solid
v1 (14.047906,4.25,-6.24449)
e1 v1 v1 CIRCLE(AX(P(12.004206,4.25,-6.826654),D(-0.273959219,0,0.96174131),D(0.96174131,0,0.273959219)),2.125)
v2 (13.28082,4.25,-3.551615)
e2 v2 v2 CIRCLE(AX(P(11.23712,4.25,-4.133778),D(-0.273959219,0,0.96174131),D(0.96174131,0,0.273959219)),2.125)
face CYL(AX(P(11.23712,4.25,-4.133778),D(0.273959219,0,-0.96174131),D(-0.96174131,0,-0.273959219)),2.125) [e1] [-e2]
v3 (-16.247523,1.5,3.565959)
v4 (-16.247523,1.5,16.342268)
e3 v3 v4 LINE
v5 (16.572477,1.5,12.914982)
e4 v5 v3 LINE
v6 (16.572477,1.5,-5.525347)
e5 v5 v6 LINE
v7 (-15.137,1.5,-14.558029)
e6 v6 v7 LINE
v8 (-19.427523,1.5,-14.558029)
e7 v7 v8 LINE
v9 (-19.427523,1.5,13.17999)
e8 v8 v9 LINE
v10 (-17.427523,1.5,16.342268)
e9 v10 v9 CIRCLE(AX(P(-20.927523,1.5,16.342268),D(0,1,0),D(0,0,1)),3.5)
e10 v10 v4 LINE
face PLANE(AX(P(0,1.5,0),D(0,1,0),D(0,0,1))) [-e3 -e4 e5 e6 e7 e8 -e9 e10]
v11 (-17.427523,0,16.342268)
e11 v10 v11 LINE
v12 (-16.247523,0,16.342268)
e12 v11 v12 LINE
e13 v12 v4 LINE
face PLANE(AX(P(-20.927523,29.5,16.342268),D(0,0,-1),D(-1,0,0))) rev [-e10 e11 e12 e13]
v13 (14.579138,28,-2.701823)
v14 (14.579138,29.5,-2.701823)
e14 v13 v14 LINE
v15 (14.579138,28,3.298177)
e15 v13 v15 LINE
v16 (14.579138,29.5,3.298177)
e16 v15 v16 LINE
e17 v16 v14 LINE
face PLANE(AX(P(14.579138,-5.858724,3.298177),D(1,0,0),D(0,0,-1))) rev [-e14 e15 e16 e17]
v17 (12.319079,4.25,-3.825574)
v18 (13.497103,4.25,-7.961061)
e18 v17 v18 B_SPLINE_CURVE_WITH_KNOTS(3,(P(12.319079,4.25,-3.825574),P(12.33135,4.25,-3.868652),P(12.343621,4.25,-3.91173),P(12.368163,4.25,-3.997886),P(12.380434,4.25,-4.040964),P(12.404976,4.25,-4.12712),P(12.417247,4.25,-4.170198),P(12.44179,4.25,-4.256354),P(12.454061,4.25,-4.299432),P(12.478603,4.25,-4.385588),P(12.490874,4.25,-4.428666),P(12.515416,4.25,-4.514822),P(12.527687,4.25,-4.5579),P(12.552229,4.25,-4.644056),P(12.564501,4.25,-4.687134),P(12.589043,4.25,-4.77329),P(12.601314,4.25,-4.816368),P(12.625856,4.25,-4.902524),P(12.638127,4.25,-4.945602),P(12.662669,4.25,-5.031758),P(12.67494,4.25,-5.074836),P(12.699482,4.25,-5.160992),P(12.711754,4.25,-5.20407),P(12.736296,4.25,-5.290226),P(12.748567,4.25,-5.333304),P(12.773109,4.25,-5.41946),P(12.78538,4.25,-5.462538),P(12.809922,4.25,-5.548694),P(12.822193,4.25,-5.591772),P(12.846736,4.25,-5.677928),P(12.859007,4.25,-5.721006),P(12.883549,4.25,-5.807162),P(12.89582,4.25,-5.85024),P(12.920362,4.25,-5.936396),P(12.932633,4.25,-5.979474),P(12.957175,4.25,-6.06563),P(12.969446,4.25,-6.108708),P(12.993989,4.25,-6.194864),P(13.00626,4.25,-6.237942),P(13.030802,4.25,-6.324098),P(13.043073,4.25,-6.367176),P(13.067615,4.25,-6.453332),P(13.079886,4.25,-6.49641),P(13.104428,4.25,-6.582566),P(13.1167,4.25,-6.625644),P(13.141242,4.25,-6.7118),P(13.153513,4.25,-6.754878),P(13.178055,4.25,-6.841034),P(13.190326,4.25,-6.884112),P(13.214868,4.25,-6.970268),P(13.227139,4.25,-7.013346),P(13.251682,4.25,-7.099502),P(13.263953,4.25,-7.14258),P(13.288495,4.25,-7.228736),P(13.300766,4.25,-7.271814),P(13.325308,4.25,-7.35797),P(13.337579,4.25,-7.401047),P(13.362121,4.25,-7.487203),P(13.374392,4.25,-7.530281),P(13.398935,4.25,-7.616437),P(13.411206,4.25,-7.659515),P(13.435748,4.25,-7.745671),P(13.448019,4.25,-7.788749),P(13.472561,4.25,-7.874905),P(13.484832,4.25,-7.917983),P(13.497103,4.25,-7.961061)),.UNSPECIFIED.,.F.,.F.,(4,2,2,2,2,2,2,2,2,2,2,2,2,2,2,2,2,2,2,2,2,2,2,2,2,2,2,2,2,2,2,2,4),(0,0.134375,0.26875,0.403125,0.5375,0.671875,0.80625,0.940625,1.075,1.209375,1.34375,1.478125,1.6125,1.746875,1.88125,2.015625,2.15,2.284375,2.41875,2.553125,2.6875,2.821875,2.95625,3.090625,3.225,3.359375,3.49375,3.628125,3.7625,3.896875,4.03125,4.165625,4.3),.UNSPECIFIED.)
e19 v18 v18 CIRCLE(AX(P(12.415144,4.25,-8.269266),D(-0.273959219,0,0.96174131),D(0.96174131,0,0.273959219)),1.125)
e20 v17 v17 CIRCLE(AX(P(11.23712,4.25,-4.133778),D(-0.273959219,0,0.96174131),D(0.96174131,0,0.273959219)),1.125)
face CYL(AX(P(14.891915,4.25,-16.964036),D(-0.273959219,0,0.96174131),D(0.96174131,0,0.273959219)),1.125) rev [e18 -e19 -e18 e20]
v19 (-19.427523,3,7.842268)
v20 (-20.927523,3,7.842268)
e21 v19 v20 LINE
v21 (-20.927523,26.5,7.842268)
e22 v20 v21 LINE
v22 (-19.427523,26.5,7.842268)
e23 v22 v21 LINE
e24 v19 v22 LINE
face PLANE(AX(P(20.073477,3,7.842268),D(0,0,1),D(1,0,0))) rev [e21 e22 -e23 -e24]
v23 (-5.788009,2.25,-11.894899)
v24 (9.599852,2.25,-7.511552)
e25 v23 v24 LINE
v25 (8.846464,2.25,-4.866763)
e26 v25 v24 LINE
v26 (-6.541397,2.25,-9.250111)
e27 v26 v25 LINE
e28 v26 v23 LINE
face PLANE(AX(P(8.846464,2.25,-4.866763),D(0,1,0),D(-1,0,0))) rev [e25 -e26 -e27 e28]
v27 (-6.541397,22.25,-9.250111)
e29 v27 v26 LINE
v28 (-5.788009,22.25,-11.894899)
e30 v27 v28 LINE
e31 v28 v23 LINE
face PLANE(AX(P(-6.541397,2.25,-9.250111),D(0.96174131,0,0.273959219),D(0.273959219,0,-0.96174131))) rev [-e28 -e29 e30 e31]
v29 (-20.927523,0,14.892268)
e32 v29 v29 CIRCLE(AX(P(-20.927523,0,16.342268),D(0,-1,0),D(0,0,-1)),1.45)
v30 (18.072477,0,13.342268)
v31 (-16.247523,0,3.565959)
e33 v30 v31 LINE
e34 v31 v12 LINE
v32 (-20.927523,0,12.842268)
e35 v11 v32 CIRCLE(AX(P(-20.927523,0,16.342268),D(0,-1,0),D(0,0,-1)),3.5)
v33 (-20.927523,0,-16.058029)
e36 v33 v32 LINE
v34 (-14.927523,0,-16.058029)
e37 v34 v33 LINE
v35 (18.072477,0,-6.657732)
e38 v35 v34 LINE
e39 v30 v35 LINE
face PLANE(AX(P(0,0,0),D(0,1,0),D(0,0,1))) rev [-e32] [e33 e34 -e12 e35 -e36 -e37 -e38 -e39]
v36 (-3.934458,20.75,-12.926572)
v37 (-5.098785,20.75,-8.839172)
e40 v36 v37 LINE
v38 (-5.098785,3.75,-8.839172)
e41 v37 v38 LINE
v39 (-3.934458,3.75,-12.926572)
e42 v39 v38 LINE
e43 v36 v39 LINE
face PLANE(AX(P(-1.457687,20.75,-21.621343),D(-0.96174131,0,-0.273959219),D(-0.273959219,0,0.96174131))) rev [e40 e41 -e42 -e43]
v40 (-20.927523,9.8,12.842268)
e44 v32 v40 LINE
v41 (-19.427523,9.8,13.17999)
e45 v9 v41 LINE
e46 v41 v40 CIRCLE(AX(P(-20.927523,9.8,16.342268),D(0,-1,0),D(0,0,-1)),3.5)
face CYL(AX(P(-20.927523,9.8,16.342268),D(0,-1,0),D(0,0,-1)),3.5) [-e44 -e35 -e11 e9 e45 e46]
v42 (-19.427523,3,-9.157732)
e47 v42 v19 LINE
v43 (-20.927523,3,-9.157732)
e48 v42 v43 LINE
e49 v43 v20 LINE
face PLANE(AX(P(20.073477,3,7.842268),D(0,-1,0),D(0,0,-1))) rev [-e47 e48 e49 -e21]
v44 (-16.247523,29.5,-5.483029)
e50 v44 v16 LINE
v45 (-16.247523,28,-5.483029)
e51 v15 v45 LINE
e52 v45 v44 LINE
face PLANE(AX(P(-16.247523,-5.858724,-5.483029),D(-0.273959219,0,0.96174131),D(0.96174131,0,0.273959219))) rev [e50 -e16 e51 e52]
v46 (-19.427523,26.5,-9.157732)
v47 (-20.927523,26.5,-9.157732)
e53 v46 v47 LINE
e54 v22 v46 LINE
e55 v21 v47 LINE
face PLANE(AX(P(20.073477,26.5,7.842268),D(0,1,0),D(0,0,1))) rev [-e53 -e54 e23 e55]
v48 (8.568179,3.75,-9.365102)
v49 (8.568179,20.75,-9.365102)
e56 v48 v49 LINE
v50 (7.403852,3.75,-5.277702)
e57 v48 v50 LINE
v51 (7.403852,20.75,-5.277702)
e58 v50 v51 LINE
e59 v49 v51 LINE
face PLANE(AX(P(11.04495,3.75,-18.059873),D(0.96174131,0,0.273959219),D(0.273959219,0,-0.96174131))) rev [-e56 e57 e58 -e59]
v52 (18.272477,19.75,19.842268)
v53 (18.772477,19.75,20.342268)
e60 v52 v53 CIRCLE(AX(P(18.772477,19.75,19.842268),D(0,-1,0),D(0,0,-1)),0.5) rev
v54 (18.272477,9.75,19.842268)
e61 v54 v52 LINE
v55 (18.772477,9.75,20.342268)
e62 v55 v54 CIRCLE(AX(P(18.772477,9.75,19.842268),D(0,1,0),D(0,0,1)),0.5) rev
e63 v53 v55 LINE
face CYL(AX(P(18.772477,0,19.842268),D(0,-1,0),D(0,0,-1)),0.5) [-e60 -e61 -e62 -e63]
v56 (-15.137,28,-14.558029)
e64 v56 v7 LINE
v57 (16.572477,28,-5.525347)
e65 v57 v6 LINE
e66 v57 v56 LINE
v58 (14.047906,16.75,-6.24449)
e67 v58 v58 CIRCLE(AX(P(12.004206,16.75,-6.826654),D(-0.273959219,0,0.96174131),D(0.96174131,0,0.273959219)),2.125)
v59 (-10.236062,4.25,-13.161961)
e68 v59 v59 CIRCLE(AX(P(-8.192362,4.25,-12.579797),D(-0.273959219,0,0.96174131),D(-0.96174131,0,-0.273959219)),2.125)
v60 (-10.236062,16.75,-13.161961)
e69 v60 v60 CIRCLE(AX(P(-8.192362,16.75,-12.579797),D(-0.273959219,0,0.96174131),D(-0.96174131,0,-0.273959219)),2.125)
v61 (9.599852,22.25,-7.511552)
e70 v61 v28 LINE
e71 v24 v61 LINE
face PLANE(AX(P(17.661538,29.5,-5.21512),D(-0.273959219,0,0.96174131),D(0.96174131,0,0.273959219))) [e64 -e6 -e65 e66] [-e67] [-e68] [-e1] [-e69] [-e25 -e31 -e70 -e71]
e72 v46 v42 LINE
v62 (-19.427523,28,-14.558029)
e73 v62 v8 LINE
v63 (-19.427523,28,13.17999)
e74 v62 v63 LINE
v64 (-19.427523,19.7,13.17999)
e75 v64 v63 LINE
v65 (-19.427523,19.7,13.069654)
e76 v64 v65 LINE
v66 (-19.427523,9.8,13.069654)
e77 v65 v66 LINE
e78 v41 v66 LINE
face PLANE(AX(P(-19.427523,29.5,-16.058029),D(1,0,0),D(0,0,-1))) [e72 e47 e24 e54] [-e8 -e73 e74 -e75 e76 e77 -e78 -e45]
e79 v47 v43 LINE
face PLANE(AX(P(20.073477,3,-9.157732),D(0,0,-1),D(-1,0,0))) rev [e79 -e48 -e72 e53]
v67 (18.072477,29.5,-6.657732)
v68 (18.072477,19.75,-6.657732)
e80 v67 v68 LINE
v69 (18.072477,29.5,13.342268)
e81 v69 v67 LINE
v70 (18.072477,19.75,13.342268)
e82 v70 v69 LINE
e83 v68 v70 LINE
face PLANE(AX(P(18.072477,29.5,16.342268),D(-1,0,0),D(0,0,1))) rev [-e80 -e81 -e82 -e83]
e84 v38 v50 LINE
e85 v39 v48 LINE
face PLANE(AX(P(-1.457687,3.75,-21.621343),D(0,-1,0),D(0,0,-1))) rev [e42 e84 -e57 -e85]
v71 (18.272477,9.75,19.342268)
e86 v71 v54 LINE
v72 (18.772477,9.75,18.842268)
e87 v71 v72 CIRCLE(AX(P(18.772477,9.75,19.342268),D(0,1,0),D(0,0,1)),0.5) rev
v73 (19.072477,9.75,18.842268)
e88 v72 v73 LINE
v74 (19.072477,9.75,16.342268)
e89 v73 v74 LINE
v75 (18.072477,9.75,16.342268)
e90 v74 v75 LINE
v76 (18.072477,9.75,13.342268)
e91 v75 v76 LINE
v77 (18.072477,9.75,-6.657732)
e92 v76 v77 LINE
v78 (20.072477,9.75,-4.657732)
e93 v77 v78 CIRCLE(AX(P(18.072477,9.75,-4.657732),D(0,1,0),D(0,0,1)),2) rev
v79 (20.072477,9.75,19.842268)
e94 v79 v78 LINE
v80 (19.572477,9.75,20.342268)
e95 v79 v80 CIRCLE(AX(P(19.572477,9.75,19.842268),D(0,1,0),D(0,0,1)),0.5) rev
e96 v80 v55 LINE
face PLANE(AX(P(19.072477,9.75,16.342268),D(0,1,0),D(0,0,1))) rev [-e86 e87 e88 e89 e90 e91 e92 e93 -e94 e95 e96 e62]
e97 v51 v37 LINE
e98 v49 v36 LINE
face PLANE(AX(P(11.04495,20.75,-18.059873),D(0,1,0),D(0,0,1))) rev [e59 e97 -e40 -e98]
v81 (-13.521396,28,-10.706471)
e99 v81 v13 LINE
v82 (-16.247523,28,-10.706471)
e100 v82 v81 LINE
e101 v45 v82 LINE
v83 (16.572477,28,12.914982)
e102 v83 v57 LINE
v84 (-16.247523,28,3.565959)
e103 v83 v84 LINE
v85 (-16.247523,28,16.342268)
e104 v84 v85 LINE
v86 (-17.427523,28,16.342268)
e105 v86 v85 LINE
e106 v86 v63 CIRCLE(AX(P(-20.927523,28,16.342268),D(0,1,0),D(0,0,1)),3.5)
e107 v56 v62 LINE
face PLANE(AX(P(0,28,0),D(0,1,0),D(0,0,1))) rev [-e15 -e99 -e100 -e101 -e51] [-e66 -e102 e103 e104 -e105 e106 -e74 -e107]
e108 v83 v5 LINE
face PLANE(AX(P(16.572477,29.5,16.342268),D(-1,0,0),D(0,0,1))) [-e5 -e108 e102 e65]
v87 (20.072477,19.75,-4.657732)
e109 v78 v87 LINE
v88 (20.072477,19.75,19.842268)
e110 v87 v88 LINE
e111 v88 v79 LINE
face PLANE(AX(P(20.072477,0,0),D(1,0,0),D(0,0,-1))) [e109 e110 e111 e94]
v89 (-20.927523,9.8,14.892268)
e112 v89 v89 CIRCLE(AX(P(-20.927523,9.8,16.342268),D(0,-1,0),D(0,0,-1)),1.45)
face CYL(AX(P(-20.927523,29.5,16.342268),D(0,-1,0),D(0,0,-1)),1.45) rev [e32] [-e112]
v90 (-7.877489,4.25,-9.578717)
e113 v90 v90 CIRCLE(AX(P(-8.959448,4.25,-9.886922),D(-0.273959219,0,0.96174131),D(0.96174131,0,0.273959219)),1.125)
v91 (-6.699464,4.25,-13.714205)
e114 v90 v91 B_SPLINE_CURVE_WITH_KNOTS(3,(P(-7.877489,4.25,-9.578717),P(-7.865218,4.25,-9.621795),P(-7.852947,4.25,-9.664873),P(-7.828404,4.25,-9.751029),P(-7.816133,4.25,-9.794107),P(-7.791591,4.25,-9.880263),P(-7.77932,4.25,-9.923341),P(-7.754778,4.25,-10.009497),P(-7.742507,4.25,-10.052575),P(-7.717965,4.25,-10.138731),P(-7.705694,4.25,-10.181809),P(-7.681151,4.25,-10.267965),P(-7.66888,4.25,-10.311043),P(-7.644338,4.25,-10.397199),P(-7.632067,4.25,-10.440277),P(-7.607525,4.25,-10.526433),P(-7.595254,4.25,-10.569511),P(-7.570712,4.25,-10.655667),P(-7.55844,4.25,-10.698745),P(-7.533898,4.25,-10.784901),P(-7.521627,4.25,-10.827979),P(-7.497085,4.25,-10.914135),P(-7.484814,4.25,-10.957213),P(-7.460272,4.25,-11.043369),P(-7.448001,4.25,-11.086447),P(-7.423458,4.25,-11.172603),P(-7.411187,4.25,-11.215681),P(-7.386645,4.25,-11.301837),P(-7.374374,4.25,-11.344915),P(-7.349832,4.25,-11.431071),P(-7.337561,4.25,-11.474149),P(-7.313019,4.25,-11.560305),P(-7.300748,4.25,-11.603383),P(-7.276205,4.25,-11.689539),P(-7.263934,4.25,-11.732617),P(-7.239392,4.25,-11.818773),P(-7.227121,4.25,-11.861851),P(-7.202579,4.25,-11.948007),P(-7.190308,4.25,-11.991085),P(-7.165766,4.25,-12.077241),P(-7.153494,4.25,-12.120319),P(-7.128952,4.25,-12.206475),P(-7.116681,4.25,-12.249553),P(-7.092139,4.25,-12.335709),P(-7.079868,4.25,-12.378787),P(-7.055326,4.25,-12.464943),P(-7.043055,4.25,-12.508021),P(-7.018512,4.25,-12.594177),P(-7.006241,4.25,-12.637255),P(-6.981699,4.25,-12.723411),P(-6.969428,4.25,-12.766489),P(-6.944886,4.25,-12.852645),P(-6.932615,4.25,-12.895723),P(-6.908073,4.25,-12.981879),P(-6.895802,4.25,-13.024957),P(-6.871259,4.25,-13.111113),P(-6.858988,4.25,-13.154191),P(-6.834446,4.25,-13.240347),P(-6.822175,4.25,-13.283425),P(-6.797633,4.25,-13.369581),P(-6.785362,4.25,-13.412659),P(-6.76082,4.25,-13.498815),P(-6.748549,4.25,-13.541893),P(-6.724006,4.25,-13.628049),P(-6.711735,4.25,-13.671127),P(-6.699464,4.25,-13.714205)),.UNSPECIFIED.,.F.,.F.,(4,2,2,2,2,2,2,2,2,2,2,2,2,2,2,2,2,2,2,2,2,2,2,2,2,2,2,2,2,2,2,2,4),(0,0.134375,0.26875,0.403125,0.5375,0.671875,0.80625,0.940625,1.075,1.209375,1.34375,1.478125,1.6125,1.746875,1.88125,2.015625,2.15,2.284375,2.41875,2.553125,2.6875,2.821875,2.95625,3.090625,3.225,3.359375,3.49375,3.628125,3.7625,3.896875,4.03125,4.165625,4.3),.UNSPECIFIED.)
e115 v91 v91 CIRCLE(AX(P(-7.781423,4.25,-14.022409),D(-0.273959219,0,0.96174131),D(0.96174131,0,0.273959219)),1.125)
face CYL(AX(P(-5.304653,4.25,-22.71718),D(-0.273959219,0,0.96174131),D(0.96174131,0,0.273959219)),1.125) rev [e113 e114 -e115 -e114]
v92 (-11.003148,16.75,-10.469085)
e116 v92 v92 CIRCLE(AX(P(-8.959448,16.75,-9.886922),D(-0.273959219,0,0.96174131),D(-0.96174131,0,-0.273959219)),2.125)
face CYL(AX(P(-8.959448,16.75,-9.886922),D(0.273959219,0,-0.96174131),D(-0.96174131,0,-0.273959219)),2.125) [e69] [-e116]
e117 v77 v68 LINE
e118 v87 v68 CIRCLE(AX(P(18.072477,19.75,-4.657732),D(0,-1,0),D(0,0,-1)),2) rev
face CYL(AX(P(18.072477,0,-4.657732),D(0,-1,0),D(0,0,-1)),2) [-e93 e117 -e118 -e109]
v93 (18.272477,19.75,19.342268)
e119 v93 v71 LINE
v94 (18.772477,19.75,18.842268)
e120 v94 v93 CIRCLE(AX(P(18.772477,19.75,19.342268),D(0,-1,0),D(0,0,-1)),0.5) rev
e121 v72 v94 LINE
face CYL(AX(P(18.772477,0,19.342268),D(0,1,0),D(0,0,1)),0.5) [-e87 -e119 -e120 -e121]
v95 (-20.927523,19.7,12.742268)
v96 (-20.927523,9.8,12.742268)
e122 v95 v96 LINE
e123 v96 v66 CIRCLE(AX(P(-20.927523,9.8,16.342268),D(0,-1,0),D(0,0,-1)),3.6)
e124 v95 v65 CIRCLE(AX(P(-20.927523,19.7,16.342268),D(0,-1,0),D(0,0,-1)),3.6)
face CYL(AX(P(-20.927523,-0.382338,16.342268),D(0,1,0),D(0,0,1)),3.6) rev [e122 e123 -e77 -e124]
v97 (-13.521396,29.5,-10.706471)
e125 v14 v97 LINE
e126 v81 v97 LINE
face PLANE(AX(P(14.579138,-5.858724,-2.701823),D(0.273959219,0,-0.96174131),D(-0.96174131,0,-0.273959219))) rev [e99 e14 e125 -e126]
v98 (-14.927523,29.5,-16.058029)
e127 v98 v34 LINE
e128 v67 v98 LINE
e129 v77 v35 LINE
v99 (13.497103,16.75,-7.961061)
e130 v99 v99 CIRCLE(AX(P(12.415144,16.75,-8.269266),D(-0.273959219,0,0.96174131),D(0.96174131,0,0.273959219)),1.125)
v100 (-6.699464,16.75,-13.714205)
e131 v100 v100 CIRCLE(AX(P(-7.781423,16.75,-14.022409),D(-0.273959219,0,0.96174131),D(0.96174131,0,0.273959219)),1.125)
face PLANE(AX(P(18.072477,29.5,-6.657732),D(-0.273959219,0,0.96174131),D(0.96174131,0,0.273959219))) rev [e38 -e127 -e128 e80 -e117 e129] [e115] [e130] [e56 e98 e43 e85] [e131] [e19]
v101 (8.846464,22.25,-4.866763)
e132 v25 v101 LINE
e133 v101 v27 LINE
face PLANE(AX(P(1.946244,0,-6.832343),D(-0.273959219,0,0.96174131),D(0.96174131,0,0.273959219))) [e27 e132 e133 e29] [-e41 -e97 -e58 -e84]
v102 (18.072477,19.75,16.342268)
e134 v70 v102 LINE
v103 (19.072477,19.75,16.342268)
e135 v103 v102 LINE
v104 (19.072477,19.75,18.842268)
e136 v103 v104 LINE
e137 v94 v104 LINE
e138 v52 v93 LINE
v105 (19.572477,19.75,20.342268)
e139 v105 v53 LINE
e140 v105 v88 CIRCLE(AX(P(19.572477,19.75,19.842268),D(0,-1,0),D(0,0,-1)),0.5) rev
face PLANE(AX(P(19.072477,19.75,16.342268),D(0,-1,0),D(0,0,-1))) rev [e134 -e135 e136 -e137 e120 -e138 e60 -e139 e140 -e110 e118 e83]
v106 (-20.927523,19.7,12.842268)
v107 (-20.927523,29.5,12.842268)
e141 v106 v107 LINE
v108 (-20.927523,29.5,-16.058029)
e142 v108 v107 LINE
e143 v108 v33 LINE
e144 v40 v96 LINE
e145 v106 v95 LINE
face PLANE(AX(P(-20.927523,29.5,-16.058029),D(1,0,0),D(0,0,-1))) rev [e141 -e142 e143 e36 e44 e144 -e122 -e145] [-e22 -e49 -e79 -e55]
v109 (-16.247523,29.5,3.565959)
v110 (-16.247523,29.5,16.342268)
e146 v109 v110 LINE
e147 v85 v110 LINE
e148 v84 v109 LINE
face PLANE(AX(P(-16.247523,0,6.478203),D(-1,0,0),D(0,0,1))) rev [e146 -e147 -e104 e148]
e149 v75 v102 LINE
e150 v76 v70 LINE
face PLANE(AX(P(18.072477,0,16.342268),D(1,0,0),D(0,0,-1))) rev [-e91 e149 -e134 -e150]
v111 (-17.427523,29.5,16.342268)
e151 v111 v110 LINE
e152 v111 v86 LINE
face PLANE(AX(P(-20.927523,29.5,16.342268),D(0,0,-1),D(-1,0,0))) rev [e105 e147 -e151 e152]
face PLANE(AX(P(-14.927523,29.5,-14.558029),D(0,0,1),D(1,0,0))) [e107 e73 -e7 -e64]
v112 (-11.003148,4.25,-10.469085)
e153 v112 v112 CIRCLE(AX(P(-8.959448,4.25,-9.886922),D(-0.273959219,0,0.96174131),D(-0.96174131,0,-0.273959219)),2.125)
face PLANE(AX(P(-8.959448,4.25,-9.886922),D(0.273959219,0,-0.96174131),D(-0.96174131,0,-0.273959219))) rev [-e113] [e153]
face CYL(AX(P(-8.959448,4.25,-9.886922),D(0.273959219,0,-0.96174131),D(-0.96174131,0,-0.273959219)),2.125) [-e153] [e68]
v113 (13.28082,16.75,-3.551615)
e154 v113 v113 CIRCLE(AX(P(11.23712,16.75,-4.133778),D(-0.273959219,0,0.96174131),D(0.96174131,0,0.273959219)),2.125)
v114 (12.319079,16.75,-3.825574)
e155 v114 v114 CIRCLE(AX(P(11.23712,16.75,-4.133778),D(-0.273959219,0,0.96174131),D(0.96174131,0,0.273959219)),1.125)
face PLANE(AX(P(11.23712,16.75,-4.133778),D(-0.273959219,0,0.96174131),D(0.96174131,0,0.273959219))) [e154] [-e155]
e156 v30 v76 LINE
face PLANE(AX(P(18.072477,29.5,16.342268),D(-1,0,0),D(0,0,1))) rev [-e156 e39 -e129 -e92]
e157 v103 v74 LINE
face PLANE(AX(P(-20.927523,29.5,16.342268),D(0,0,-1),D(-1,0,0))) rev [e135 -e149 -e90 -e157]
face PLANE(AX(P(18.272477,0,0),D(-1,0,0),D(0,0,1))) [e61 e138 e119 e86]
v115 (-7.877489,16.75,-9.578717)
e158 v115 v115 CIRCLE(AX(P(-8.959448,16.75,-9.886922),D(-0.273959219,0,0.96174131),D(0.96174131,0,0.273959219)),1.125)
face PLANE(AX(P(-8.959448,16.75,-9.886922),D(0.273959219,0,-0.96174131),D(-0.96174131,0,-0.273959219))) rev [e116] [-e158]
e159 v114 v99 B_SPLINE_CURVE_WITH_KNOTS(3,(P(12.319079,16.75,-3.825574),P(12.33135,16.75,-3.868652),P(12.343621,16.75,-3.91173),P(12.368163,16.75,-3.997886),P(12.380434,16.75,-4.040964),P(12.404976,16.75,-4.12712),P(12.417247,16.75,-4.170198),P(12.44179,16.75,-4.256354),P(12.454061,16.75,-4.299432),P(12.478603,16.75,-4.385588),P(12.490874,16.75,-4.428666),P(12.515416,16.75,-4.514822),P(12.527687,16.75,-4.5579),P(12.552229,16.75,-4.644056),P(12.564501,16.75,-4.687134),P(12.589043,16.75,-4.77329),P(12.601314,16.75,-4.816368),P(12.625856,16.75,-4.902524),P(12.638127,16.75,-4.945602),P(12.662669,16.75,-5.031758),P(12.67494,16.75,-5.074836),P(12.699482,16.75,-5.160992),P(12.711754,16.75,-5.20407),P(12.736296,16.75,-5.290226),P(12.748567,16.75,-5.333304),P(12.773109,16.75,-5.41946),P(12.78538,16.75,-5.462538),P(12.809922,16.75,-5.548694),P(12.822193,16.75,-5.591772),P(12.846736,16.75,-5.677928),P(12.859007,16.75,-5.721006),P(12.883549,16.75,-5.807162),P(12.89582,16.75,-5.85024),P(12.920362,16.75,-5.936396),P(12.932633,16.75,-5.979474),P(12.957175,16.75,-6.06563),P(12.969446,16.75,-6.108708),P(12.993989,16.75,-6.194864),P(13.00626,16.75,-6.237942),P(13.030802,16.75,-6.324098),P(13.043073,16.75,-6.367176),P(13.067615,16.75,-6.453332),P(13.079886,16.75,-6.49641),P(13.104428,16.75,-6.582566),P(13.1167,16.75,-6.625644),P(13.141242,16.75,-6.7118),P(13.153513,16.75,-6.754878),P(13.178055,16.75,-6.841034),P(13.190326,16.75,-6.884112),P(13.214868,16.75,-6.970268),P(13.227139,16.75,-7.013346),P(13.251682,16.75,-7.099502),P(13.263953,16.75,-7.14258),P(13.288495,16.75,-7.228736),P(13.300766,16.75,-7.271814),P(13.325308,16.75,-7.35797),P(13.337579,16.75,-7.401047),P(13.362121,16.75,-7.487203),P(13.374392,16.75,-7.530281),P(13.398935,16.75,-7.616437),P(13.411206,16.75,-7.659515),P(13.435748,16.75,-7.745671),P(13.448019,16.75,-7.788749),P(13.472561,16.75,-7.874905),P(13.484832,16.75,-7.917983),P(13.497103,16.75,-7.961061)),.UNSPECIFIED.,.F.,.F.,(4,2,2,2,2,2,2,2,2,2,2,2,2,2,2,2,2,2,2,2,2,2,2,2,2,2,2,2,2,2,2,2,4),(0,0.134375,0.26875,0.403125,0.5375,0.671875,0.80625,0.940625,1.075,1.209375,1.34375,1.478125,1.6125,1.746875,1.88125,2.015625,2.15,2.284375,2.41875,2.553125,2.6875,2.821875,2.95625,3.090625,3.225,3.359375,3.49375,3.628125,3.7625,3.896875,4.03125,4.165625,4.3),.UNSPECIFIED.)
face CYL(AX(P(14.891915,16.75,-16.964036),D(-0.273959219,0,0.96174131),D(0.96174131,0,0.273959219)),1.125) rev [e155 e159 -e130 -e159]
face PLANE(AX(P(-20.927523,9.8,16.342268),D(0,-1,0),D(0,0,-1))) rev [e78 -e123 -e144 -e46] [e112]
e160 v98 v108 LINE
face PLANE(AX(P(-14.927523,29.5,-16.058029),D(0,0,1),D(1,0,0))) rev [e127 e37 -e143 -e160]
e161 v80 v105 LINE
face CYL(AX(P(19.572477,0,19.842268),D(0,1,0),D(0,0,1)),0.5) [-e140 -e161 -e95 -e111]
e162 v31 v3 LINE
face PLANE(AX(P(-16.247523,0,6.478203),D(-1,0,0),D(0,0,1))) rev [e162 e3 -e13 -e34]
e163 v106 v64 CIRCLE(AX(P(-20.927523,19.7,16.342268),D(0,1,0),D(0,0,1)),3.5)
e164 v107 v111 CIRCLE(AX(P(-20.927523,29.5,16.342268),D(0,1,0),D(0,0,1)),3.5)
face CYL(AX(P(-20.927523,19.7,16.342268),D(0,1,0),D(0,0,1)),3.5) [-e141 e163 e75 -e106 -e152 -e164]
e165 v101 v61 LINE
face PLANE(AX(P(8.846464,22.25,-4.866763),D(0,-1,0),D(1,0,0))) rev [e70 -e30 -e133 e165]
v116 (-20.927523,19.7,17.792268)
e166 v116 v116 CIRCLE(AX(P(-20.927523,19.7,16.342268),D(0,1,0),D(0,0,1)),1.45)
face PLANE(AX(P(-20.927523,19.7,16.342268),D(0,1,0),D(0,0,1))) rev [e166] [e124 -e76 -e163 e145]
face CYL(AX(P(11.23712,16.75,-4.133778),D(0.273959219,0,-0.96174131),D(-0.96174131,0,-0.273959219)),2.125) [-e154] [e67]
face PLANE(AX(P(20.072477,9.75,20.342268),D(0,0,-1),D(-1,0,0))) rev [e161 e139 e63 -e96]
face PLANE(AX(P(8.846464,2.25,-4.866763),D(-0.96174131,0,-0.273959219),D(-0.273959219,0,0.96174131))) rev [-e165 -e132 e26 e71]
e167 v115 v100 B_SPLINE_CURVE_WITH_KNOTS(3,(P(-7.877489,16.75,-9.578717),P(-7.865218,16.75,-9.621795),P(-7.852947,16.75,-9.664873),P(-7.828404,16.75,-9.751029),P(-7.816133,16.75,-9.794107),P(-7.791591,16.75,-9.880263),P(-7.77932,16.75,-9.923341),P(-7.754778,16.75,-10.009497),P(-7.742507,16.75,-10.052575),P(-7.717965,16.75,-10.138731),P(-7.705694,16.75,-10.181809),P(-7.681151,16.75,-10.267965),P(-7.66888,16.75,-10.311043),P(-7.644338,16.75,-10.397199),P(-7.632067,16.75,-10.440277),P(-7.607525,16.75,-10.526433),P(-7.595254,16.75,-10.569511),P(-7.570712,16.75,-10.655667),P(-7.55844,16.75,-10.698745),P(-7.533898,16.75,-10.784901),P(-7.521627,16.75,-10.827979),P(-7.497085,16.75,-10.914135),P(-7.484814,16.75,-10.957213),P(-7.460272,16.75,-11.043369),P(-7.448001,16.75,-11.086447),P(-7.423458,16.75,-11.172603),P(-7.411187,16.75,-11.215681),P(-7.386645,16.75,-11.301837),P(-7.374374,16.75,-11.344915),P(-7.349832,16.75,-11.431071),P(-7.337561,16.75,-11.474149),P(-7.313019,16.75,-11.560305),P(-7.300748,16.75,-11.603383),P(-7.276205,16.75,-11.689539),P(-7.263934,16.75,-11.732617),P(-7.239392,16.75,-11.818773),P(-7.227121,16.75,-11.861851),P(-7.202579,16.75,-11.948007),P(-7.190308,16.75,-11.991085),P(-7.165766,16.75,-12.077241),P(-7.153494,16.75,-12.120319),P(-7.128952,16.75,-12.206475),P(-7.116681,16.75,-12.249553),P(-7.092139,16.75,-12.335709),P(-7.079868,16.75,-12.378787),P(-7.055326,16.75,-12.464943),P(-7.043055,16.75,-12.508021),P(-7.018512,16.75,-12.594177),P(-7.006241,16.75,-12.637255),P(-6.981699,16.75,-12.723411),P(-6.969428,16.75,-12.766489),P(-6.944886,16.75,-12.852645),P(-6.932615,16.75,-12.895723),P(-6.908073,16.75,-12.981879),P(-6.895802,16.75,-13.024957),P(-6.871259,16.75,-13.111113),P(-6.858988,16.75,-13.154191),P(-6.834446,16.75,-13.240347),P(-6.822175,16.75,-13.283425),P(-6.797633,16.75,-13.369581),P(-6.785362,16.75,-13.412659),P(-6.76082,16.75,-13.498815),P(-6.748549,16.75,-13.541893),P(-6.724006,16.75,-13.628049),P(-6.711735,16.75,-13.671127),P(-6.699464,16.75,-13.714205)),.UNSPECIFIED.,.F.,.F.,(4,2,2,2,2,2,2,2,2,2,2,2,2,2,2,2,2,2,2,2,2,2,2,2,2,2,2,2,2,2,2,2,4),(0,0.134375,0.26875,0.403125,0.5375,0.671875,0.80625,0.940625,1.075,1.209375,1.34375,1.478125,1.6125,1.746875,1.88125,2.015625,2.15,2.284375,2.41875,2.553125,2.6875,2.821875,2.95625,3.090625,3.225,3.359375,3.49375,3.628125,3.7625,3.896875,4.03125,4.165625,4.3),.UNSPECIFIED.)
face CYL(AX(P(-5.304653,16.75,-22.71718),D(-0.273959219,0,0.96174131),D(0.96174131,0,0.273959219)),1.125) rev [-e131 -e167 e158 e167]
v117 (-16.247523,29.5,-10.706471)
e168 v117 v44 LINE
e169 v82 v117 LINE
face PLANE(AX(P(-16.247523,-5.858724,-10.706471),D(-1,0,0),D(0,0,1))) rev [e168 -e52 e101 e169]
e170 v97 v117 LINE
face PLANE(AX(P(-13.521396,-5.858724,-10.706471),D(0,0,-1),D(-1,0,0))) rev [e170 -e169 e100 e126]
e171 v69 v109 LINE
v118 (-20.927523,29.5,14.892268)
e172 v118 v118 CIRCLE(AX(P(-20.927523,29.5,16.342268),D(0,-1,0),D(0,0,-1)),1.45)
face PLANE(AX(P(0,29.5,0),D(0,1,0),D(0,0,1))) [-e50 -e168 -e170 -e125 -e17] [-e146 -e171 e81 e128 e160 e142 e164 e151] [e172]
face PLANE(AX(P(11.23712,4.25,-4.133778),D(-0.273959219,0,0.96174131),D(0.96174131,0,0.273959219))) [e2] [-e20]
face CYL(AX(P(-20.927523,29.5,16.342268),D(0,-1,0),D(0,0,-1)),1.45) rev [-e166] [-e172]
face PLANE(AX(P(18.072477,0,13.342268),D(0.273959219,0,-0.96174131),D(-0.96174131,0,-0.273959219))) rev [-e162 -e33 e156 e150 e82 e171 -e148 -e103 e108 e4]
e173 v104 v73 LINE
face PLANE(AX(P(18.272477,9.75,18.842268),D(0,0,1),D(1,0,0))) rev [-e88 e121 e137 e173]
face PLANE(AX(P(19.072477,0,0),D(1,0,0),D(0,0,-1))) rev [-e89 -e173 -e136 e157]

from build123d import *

# Parameters (mm, degrees)
BOSS_EXTRUDE1_DEPTH     = 29.5
SHELL1_T                = -1.5
SKETCH11_W              = 16
SKETCH11_H              = 20
BOSS_EXTRUDE6_DEPTH     = 2.75
CUT_EXTRUDE1_DEPTH      = 46.77263185
CUT_EXTRUDE1_DEPTH_BACK = 46.77263185
SKETCH3_W               = 13
SKETCH3_H               = 17
SKETCH4_R               = 2.125
BOSS_EXTRUDE2_DEPTH     = 2.8
SKETCH5_R               = 1.125
CUT_EXTRUDE2_DEPTH      = 44.905225798
SKETCH6_R               = 3.5
BOSS_EXTRUDE3_DEPTH     = 9.8
BOSS_EXTRUDE4_START     = -9.8
SKETCH7_R               = 3.5
BOSS_EXTRUDE4_DEPTH     = 9.8
SKETCH8_R               = 3.6
CUT_EXTRUDE3_DEPTH      = 9.9
SKETCH9_R               = 1.45
CUT_EXTRUDE4_DEPTH      = 44.135478309
SKETCH12_W              = 23
SKETCH12_H              = 10
BOSS_EXTRUDE7_DEPTH     = 1
SKETCH13_W              = 27
SKETCH13_H              = 10
BOSS_EXTRUDE8_DEPTH     = 1
SKETCH14_W              = 1.5
SKETCH14_H              = 10
BOSS_EXTRUDE9_DEPTH     = 0.8
FILLET2_R               = 0.5
FILLET3_R               = 0.5
FILLET4_R               = 2
CUT_EXTRUDE5_DEPTH      = 44.367750194
CUT_EXTRUDE6_REACH      = 56.452
SKETCH16_W              = 17
SKETCH16_H              = 23.5
CUT_EXTRUDE7_DEPTH      = 1.5


with BuildPart() as part:
    # Sketch2 → Boss-Extrude1 (new body)
    with BuildSketch(Plane(origin=(0, 0, 0), x_dir=(1, 0, 0), z_dir=(0, 1, 0))):
        Polygon((18.072476765, -16.342267954), (18.072476765, 6.657732046), (-14.927523235, 16.058029327), (-20.927523235, 16.058029327), (-20.927523235, -16.342267954), align=None)
    extrude(amount=BOSS_EXTRUDE1_DEPTH)

    # Shell1
    shell1_openings = [part.faces().sort_by_distance(p)[0] for p in [
        (-1.427523235, 14.75, 16.342267954),
    ]]
    offset(amount=SHELL1_T, openings=shell1_openings, kind=Kind.INTERSECTION)

    # Sketch11 → Boss-Extrude6 (add)
    with BuildSketch(Plane(origin=(2.699631824, 0, -9.477131153), x_dir=(0.9617413095492132, 0, 0.2739592186924259), z_dir=(-0.2739592186924259, 0, 0.9617413095492132))):
        with Locations((-0.825284328, 12.25)):
            Rectangle(SKETCH11_W, SKETCH11_H)
    extrude(amount=BOSS_EXTRUDE6_DEPTH)

    # Sketch3 → Cut-Extrude1 (cut, two sides: drawn at the far end of the back side and taken through both)
    with BuildSketch(Plane(origin=(2.699631824, 0, -9.477131153), x_dir=(0.9617413095492132, 0, 0.2739592186924259), z_dir=(-0.2739592186924259, 0, 0.9617413095492132)).offset(-CUT_EXTRUDE1_DEPTH_BACK)):
        with Locations((-0.825284328, 12.25)):
            Rectangle(SKETCH3_W, SKETCH3_H)
    extrude(amount=CUT_EXTRUDE1_DEPTH + CUT_EXTRUDE1_DEPTH_BACK, mode=Mode.SUBTRACT)

    # Sketch4 → Boss-Extrude2 (add)
    with BuildSketch(Plane(origin=(2.699631824, 0, -9.477131153), x_dir=(0.9617413095492132, 0, 0.2739592186924259), z_dir=(-0.2739592186924259, 0, 0.9617413095492132))):
        with Locations((9.674715672, 4.25)):
            Circle(SKETCH4_R)
        with Locations((9.674715672, 16.75)):
            Circle(SKETCH4_R)
        with Locations(Location((-11.325284328, 16.75, 0), (0, 0, 180))):
            Circle(SKETCH4_R)
        with Locations(Location((-11.325284328, 4.25, 0), (0, 0, 180))):
            Circle(SKETCH4_R)
    extrude(amount=BOSS_EXTRUDE2_DEPTH)

    # Sketch5 → Cut-Extrude2 (cut, through all)
    with BuildSketch(Plane(origin=(1.932546012, 0, -6.784255486), x_dir=(0.9617413095492132, 0, 0.2739592186924259), z_dir=(-0.2739592186924259, 0, 0.9617413095492132))):
        with Locations((9.674715672, 4.25)):
            Circle(SKETCH5_R)
        with Locations((9.674715672, 16.75)):
            Circle(SKETCH5_R)
        with Locations((-11.325284328, 4.25)):
            Circle(SKETCH5_R)
        with Locations((-11.325284328, 16.75)):
            Circle(SKETCH5_R)
    extrude(amount=-CUT_EXTRUDE2_DEPTH, mode=Mode.SUBTRACT)

    # Sketch6 → Boss-Extrude3 (add)
    with BuildSketch(Plane(origin=(0, 29.5, 0), x_dir=(1, 0, 0), z_dir=(0, 1, 0))):
        with Locations((-20.927523235, -16.342267954)):
            Circle(SKETCH6_R)
    extrude(amount=-BOSS_EXTRUDE3_DEPTH)

    # Sketch7 → Boss-Extrude4 (add)
    with BuildSketch(Plane(origin=(0, 0, 0), x_dir=(-1, 0, 0), z_dir=(0, -1, 0)).offset(BOSS_EXTRUDE4_START)):
        with Locations((20.927523235, -16.342267954)):
            Circle(SKETCH7_R)
    extrude(amount=BOSS_EXTRUDE4_DEPTH)

    # Sketch8 → Cut-Extrude3 (cut)
    with BuildSketch(Plane(origin=(0, 19.7, 0), x_dir=(-1, 0, 0), z_dir=(0, -1, 0))):
        with Locations((20.927523235, -16.342267954)):
            Circle(SKETCH8_R)
    extrude(amount=CUT_EXTRUDE3_DEPTH, mode=Mode.SUBTRACT)

    # Sketch9 → Cut-Extrude4 (cut, through all)
    with BuildSketch(Plane(origin=(0, 0, 0), x_dir=(-1, 0, 0), z_dir=(0, -1, 0))):
        with Locations(Location((20.927523235, -16.342267954, 0), (0, 0, 90))):
            Circle(SKETCH9_R)
    extrude(amount=-CUT_EXTRUDE4_DEPTH, mode=Mode.SUBTRACT)

    # Sketch12 → Boss-Extrude7 (add)
    with BuildSketch(Plane(origin=(18.072476765, 0, 0), x_dir=(0, 0, -1), z_dir=(1, 0, 0))):
        with Locations((-4.842267954, 14.75)):
            Rectangle(SKETCH12_W, SKETCH12_H)
    extrude(amount=BOSS_EXTRUDE7_DEPTH)

    # Sketch13 → Boss-Extrude8 (add)
    with BuildSketch(Plane(origin=(19.072476765, 0, 0), x_dir=(0, 0, -1), z_dir=(1, 0, 0))):
        with Locations((-6.842267954, 14.75)):
            Rectangle(SKETCH13_W, SKETCH13_H)
    extrude(amount=BOSS_EXTRUDE8_DEPTH)

    # Sketch14 → Boss-Extrude9 (add)
    with BuildSketch(Plane.ZY.offset(-19.072476765)):
        with Locations((19.592267954, 14.75)):
            Rectangle(SKETCH14_W, SKETCH14_H)
    extrude(amount=BOSS_EXTRUDE9_DEPTH)

    # Fillet2
    fillet2_edges = [part.edges().sort_by_distance(p)[0] for p in [
        (20.072476765, 14.75, 20.342267954),
        (18.272476765, 14.75, 18.842267954),
    ]]
    fillet(fillet2_edges, radius=FILLET2_R)

    # Fillet3
    fillet3_edges = [part.edges().sort_by_distance(p)[0] for p in [
        (18.272476765, 14.75, 20.342267954),
    ]]
    fillet(fillet3_edges, radius=FILLET3_R)

    # Fillet4
    fillet4_edges = [part.edges().sort_by_distance(p)[0] for p in [
        (20.072476765, 14.75, -6.657732046),
    ]]
    fillet(fillet4_edges, radius=FILLET4_R - 0.0001)  # a hair under: the kernel refuses the full size

    # Sketch15 → Cut-Extrude5 (cut, through all)
    with BuildSketch(Plane(origin=(0, 29.5, 0), x_dir=(1, 0, 0), z_dir=(0, 1, 0))):
        Polygon((18.072476765, -13.342267954), (-16.247523235, -3.565958782), (-16.247523235, -6.478203224), (-16.247523235, -16.342267954), (18.072476765, -16.342267954), align=None)
    extrude(amount=-CUT_EXTRUDE5_DEPTH, mode=Mode.SUBTRACT)

    # Sketch16 → Cut-Extrude6 (cut, up to next)
    with BuildSketch(Plane.ZY.offset(20.927523235), mode=Mode.PRIVATE) as cut_extrude6_sk1:
        with Locations((-0.657732046, 14.75)):
            Rectangle(SKETCH16_W, SKETCH16_H)
    cut_extrude6_tool1 = extrude(cut_extrude6_sk1.sketch, amount=-CUT_EXTRUDE6_REACH, mode=Mode.PRIVATE) & part.part
    add(cut_extrude6_tool1.solids().sort_by_distance((-20.927523, 14.75, -0.657732))[0], mode=Mode.SUBTRACT)

    # Sketch17 → Cut-Extrude7 (cut)
    with BuildSketch(Plane(origin=(0, 29.5, 0), x_dir=(1, 0, 0), z_dir=(0, 1, 0))):
        Polygon((-16.247523235, 5.483028504), (14.579138142, -3.298176984), (14.579138142, 2.701823016), (-13.521396163, 10.70647078), (-16.247523235, 10.70647078), align=None)
    extrude(amount=-CUT_EXTRUDE7_DEPTH, mode=Mode.SUBTRACT)


solid = part.part
